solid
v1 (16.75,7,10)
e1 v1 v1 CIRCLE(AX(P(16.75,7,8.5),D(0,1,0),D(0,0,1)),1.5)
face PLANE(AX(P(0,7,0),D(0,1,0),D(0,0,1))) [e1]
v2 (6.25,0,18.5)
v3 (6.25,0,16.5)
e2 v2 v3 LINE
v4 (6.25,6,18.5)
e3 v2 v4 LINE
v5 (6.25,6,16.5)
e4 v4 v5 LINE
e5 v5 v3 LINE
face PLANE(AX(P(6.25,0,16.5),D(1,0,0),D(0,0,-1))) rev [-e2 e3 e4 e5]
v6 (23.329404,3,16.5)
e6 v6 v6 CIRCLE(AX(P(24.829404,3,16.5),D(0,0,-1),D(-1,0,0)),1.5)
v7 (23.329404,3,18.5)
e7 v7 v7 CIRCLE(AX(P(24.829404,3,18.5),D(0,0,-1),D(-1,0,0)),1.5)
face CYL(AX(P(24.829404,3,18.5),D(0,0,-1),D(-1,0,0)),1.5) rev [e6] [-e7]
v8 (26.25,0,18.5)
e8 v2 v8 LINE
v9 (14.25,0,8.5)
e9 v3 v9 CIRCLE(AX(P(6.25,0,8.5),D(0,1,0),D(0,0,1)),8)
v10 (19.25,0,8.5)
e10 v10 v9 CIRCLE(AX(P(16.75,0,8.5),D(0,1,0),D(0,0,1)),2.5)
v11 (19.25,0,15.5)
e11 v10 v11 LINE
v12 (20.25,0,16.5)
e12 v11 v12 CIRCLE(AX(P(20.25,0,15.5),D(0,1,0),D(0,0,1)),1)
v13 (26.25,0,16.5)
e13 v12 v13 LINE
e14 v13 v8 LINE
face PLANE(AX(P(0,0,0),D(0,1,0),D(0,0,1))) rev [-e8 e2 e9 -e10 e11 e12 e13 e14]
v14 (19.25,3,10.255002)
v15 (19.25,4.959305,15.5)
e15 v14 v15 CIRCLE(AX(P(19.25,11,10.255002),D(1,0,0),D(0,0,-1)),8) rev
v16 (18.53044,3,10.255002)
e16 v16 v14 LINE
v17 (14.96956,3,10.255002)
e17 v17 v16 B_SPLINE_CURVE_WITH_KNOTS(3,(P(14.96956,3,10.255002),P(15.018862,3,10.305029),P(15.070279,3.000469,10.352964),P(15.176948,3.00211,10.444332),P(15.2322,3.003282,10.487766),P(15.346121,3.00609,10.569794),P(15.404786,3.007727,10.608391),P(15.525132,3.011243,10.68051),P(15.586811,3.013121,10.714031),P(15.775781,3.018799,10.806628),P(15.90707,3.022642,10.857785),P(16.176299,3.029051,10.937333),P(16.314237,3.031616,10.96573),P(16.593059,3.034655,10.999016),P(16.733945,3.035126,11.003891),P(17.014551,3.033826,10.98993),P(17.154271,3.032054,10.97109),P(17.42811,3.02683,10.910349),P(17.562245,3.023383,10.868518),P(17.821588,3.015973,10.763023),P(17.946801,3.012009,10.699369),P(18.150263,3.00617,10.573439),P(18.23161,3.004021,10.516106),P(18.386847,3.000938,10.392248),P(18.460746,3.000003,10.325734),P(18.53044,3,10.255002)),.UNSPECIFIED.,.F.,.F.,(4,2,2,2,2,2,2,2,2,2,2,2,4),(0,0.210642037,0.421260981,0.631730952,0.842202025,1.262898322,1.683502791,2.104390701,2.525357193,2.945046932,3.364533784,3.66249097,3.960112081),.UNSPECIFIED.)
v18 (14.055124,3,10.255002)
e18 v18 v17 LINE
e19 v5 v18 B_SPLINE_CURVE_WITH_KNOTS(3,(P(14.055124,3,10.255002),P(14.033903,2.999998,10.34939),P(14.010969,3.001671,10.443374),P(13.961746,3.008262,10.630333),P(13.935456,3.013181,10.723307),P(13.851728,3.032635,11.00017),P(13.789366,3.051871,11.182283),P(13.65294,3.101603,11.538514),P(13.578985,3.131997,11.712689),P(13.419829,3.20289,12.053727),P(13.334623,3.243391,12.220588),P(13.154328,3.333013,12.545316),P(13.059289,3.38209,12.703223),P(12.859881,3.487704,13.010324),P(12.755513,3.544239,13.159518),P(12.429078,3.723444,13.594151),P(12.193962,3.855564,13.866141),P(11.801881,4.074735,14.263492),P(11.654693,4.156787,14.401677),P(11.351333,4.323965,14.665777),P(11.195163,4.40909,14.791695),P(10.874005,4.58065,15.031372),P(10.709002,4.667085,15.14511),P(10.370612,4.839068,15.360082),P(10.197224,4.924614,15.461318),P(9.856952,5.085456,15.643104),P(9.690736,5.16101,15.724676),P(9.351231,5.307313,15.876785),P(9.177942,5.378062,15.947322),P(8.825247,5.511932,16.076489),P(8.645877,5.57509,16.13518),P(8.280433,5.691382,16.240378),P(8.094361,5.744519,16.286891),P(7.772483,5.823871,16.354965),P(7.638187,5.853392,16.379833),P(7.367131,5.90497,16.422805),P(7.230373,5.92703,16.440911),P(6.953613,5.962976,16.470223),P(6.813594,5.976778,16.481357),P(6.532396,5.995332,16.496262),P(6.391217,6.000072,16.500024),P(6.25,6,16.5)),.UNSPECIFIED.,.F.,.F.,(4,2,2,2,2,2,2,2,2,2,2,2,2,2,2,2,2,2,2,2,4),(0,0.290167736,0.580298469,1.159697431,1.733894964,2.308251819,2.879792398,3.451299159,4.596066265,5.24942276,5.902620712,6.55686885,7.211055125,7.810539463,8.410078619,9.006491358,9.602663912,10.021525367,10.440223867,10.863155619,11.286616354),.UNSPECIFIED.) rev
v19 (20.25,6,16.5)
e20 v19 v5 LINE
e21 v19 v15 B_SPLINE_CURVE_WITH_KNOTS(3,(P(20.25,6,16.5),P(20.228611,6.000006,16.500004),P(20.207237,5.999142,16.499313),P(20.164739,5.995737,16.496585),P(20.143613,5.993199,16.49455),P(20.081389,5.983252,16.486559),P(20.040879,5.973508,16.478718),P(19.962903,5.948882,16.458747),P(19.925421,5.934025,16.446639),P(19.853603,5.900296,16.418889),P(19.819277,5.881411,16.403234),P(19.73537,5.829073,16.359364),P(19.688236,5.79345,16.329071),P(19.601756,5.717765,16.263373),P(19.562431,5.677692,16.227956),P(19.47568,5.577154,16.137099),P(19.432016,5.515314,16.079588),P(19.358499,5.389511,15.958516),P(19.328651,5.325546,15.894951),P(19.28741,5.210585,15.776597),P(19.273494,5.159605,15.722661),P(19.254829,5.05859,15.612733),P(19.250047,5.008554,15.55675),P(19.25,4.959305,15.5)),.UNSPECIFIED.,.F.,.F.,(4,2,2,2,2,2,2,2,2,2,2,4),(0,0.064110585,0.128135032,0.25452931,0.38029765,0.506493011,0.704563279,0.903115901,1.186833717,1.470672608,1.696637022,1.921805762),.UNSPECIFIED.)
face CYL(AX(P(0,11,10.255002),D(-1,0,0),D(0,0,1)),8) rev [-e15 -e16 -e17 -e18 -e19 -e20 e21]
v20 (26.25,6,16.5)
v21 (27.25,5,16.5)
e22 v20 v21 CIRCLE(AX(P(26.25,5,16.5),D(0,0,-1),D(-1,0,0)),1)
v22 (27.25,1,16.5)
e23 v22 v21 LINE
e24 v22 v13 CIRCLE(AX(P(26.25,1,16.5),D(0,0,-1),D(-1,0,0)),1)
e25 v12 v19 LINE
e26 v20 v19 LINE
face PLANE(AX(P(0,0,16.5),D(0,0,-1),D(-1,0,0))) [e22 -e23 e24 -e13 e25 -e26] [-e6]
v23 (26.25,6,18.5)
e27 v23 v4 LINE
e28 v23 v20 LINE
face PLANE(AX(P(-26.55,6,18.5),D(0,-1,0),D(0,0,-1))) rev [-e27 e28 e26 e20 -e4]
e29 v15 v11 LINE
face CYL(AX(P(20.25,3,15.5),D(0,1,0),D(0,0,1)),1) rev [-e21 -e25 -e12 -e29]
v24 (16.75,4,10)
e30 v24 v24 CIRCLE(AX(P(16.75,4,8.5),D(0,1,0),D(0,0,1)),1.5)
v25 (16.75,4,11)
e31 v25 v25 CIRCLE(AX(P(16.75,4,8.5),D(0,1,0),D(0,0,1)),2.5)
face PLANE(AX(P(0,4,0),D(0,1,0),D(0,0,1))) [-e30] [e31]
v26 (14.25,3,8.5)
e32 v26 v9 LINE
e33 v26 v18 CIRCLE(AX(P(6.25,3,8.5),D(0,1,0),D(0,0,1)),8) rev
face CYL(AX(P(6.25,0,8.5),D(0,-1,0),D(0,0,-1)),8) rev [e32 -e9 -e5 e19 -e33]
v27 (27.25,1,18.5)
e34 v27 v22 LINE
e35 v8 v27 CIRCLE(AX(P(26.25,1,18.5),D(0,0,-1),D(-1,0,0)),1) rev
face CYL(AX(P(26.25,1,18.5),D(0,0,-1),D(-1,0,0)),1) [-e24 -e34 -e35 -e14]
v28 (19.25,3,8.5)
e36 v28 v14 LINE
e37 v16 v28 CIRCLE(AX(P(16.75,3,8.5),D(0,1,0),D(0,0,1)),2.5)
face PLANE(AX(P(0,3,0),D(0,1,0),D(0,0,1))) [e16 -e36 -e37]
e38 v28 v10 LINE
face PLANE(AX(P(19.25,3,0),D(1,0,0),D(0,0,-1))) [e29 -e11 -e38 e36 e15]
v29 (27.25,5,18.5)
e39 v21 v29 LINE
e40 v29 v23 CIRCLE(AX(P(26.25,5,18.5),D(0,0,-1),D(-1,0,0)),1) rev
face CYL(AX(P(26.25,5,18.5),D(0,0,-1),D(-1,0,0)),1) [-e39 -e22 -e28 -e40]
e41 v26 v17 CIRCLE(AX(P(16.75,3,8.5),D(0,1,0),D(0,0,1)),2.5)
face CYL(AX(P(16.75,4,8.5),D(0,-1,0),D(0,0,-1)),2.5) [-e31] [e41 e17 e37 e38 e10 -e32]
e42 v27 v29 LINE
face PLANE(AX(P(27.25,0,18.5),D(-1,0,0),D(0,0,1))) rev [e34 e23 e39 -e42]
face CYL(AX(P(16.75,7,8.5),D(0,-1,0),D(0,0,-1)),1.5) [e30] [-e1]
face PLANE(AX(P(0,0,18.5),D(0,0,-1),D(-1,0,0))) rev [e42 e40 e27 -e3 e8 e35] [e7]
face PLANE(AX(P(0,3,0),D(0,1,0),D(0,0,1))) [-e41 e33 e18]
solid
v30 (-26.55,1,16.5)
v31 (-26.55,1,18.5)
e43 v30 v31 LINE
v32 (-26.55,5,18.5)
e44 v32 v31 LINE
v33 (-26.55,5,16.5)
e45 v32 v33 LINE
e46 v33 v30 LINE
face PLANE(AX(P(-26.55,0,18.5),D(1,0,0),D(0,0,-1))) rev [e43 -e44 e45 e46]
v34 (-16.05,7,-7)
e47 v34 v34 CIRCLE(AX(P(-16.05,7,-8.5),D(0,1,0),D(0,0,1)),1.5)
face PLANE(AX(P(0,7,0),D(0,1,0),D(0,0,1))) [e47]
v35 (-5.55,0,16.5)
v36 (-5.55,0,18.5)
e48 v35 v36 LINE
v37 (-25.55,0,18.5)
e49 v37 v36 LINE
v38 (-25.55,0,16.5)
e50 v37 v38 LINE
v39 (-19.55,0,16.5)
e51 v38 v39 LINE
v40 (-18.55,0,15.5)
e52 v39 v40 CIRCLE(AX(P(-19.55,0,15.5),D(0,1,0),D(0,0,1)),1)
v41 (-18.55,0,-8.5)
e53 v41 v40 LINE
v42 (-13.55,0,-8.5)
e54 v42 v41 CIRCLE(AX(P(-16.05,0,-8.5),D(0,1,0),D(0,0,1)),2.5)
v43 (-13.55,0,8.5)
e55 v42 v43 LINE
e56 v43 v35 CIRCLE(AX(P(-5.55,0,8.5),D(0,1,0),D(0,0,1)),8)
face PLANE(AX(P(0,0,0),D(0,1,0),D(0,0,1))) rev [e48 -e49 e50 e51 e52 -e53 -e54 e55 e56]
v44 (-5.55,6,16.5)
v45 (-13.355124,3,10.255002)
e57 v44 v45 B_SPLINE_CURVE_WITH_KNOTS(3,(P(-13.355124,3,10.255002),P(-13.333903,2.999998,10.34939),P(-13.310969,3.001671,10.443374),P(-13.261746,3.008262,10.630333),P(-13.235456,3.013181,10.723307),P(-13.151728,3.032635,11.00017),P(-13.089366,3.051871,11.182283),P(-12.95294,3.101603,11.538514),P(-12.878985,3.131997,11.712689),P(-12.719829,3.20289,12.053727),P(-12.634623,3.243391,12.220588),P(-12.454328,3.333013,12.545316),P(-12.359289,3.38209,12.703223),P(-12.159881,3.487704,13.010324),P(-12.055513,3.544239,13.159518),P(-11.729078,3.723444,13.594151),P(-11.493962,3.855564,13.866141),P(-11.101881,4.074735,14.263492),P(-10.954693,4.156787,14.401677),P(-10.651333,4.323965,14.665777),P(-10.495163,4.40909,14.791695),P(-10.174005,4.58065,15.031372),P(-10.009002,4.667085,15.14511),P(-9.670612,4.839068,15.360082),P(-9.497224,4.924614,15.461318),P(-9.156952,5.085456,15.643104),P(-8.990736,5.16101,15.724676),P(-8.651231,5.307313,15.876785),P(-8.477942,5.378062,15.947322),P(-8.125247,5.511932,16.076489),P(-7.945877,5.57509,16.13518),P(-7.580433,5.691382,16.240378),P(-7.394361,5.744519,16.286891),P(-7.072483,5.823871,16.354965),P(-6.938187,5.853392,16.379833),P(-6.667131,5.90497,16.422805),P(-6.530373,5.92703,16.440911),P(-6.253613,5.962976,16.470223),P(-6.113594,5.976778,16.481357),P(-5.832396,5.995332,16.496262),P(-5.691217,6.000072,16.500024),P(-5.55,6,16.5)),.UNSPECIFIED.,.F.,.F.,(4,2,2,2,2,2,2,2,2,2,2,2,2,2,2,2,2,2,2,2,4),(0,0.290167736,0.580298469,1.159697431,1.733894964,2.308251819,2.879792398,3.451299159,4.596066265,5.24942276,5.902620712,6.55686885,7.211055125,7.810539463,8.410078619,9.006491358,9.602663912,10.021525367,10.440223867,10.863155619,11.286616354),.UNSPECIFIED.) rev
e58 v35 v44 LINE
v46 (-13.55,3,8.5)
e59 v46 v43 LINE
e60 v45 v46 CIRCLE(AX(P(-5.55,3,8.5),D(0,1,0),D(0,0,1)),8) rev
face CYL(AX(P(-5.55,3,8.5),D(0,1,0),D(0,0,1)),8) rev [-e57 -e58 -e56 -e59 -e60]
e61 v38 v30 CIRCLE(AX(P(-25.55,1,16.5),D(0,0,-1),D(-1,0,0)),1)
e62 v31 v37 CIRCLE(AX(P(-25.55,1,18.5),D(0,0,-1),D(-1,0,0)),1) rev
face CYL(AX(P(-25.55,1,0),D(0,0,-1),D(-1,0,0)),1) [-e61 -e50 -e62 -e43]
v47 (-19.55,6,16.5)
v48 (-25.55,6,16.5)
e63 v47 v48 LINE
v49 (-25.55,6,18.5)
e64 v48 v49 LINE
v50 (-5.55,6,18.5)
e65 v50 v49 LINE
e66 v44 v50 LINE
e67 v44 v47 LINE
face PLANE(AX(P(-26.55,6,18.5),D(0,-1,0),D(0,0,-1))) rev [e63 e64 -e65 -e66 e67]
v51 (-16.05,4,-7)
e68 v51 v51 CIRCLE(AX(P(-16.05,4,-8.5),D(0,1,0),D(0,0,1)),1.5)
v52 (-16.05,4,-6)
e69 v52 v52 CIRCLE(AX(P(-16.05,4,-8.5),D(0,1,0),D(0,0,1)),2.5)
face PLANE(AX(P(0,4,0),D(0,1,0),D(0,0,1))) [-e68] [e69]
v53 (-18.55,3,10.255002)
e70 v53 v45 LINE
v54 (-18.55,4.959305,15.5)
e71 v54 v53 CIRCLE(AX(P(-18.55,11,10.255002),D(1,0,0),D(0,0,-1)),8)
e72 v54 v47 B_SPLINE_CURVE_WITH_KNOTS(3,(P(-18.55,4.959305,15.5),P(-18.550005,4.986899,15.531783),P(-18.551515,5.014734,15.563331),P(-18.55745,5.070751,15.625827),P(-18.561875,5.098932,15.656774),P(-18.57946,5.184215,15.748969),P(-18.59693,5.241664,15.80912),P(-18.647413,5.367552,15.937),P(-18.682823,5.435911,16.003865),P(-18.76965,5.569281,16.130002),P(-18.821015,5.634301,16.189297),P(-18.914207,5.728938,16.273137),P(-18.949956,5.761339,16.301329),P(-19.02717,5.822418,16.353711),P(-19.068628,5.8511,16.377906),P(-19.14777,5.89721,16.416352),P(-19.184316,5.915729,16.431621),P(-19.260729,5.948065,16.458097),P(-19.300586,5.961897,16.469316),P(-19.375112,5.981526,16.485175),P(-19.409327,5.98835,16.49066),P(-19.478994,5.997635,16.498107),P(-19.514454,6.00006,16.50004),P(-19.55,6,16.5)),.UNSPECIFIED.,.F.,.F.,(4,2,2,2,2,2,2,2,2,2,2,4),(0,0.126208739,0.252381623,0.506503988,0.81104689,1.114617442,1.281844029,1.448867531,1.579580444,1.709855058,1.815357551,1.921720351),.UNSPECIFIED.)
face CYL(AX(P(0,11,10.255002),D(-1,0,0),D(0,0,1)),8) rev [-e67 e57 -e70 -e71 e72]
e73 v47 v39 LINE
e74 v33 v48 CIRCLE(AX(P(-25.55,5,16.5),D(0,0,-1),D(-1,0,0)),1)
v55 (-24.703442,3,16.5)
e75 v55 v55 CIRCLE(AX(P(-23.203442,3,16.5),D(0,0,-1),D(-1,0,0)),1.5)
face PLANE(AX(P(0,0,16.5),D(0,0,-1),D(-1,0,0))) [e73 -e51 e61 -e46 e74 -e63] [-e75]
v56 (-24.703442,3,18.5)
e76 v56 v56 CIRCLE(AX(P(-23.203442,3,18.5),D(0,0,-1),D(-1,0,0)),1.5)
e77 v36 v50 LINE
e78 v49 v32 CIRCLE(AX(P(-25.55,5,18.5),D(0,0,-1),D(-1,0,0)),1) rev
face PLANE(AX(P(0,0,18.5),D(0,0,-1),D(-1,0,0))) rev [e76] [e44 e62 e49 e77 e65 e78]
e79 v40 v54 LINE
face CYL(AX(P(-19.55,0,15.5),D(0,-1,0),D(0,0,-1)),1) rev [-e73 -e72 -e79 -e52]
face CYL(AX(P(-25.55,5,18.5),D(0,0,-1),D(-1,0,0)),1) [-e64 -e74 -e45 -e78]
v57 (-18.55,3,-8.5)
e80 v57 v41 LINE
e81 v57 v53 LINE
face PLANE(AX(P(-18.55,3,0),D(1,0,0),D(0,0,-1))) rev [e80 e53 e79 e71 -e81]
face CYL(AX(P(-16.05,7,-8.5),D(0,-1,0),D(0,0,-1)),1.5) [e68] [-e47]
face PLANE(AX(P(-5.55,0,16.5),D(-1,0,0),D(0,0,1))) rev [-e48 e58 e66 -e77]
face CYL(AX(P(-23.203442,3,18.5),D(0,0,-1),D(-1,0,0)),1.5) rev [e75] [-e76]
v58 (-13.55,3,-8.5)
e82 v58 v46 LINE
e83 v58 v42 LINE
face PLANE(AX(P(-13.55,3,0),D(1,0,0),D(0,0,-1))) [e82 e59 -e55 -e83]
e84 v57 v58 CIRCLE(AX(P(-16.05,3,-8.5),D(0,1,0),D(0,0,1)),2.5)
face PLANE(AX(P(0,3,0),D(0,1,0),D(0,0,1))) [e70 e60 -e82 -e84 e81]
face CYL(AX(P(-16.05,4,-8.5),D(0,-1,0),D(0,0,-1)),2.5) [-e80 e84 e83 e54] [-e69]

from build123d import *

# Parameters (mm, degrees)
SKETCH1_W           = 5
SKETCH1_H           = 5
BOSS_EXTRUDE1_DEPTH = 3
BOSS_EXTRUDE2_DEPTH = 4
BOSS_EXTRUDE3_DEPTH = 7
SKETCH2_W           = 53.8
SKETCH2_H           = 6
BOSS_EXTRUDE4_DEPTH = 2
FILLET2_R           = 1
FILLET3_R           = 8
FILLET4_R           = 1
SKETCH4_W           = 11.8
SKETCH4_H           = 2
CUT_EXTRUDE2_DEPTH  = 34.478537919
SKETCH5_R           = 1.5
CUT_EXTRUDE3_DEPTH  = 2


with BuildPart() as part:
    # Sketch1 → Boss-Extrude1 (new body)
    with BuildSketch(Plane(origin=(0, 0, 0), x_dir=(1, 0, 0), z_dir=(0, 1, 0))):
        with BuildLine():
            Line((-18.55, 8.5), (-18.55, -11.5))
            Line((-18.55, -11.5), (-13.55, -11.5))
            Line((-13.55, -11.5), (-13.55, 8.5))
            ThreePointArc((-13.55, 8.5), (-16.05, 6), (-18.55, 8.5))
        make_face()
        with Locations((-16.05, -14)):
            Rectangle(SKETCH1_W, SKETCH1_H)
        with Locations((16.75, -14)):
            Rectangle(SKETCH1_W, SKETCH1_H)
        with BuildLine():
            Line((14.25, -11.5), (19.25, -11.5))
            Line((19.25, -11.5), (19.25, -8.5))
            ThreePointArc((19.25, -8.5), (16.75, -11), (14.25, -8.5))
            Line((14.25, -8.5), (14.25, -11.5))
        make_face()
    extrude(amount=BOSS_EXTRUDE1_DEPTH)

    # Sketch1<3> → Boss-Extrude2 (add)
    with BuildSketch(Plane(origin=(0, 0, 0), x_dir=(1, 0, 0), z_dir=(0, 1, 0))):
        with BuildLine():
            ThreePointArc((-13.55, 8.5), (-16.05, 11), (-18.55, 8.5))
            Line((-18.55, 8.5), (-17.55, 8.5))
            ThreePointArc((-17.55, 8.5), (-16.05, 10), (-14.55, 8.5))
            Line((-14.55, 8.5), (-13.55, 8.5))
        make_face()
        with BuildLine():
            Line((-17.55, 8.5), (-18.55, 8.5))
            ThreePointArc((-18.55, 8.5), (-16.05, 6), (-13.55, 8.5))
            Line((-13.55, 8.5), (-14.55, 8.5))
            ThreePointArc((-14.55, 8.5), (-16.05, 7), (-17.55, 8.5))
        make_face()
        with BuildLine():
            ThreePointArc((14.25, -8.5), (16.75, -11), (19.25, -8.5))
            Line((19.25, -8.5), (18.25, -8.5))
            ThreePointArc((18.25, -8.5), (16.75, -10), (15.25, -8.5))
            Line((15.25, -8.5), (14.25, -8.5))
        make_face()
        with BuildLine():
            Line((18.25, -8.5), (19.25, -8.5))
            ThreePointArc((19.25, -8.5), (16.75, -6), (14.25, -8.5))
            Line((14.25, -8.5), (15.25, -8.5))
            ThreePointArc((15.25, -8.5), (16.75, -7), (18.25, -8.5))
        make_face()
    extrude(amount=BOSS_EXTRUDE2_DEPTH)

    # Sketch1<4> → Boss-Extrude3 (add)
    with BuildSketch(Plane(origin=(0, 0, 0), x_dir=(1, 0, 0), z_dir=(0, 1, 0))):
        with BuildLine():
            ThreePointArc((-14.55, 8.5), (-16.05, 10), (-17.55, 8.5))
            Line((-17.55, 8.5), (-14.55, 8.5))
        make_face()
        with BuildLine():
            Line((-14.55, 8.5), (-17.55, 8.5))
            ThreePointArc((-17.55, 8.5), (-16.05, 7), (-14.55, 8.5))
        make_face()
        with BuildLine():
            ThreePointArc((15.25, -8.5), (16.75, -10), (18.25, -8.5))
            Line((18.25, -8.5), (15.25, -8.5))
        make_face()
        with BuildLine():
            Line((15.25, -8.5), (18.25, -8.5))
            ThreePointArc((18.25, -8.5), (16.75, -7), (15.25, -8.5))
        make_face()
    extrude(amount=BOSS_EXTRUDE3_DEPTH)

    # Sketch2 → Boss-Extrude4 (add)
    with BuildSketch(Plane.XY.offset(16.5)):
        with Locations((0.35, 3)):
            Rectangle(SKETCH2_W, SKETCH2_H)
    extrude(amount=BOSS_EXTRUDE4_DEPTH)

    # Fillet2
    fillet2_edges = [part.edges().sort_by_distance(p)[0] for p in [
        (-26.55, 6, 17.5),
        (-26.55, 0, 17.5),
        (27.25, 0, 17.5),
        (27.25, 6, 17.5),
    ]]
    fillet(fillet2_edges, radius=FILLET2_R)

    # Fillet3
    # the kernel refuses this fillet: 8 mm, written as the material it adds along each edge
    with BuildSketch(Plane(origin=(14.25, 0, 16.5), x_dir=(-1, 0, 0), z_dir=(0, 1, 0))) as fillet3_piece_1:
        with BuildLine():
            CenterArc((FILLET3_R, -FILLET3_R), FILLET3_R, 90, 90)
            Line((0, -FILLET3_R), (-FILLET3_R * 0.02, -FILLET3_R))
            Line((-FILLET3_R * 0.02, -FILLET3_R), (-FILLET3_R * 0.02, FILLET3_R * 0.02))
            Line((-FILLET3_R * 0.02, FILLET3_R * 0.02), (FILLET3_R, FILLET3_R * 0.02))
            Line((FILLET3_R, FILLET3_R * 0.02), (FILLET3_R, 0))
        make_face()
    extrude(amount=3)
    with BuildSketch(Plane(origin=(14.25, 3, 16.5), x_dir=(0, 1, 0), z_dir=(1, 0, 0)), Plane(origin=(-18.55, 3, 16.5), x_dir=(0, 1, 0), z_dir=(1, 0, 0))) as fillet3_piece_2:
        with BuildLine():
            CenterArc((8, -6.244997998), FILLET3_R, 128.682187453, 51.317812547)
            Line((0, -6.244997998), (-0.16, -6.244997998))
            Line((-0.16, -6.244997998), (-0.16, 0))
            Line((-0.16, 0), (0, 0.16))
            ThreePointArc((0, 0.16), (1.5, 0.16), (2.9, 0.12489996))
            Line((2.9, 0.12489996), (3, 0))
        make_face()
    extrude(amount=5)
    with BuildSketch(Plane(origin=(-13.55, 0, 16.5), x_dir=(1, 0, 0), z_dir=(0, 1, 0))) as fillet3_piece_3:
        with BuildLine():
            CenterArc((FILLET3_R, FILLET3_R), FILLET3_R, 180, 90)
            Line((0, FILLET3_R), (-FILLET3_R * 0.02, FILLET3_R))
            Line((-FILLET3_R * 0.02, FILLET3_R), (-FILLET3_R * 0.02, -FILLET3_R * 0.02))
            Line((-FILLET3_R * 0.02, -FILLET3_R * 0.02), (FILLET3_R, -FILLET3_R * 0.02))
            Line((FILLET3_R, -FILLET3_R * 0.02), (FILLET3_R, 0))
        make_face()
    extrude(amount=3)
    with BuildSketch(Plane(origin=(14.25, 0, 16.5), x_dir=(-1, 0, 0), z_dir=(0, 1, 0))) as fillet3_piece_4a_section:
        with BuildLine():
            CenterArc((FILLET3_R, -FILLET3_R), FILLET3_R, 90, 90)
            Line((0, -FILLET3_R), (-FILLET3_R * 0.02, -FILLET3_R))
            Line((-FILLET3_R * 0.02, -FILLET3_R), (-FILLET3_R * 0.02, FILLET3_R * 0.02))
            Line((-FILLET3_R * 0.02, FILLET3_R * 0.02), (FILLET3_R, FILLET3_R * 0.02))
            Line((FILLET3_R, FILLET3_R * 0.02), (FILLET3_R, 0))
        make_face()
    fillet3_piece_4a = extrude(amount=23, mode=Mode.PRIVATE)
    fillet3_piece_4a = split(fillet3_piece_4a, bisect_by=Plane(origin=(12.438839086, 6, 14.688839086), z_dir=(0, -1, 0)), keep=Keep.TOP, mode=Mode.PRIVATE)
    fillet3_piece_4a = split(fillet3_piece_4a, bisect_by=Plane(origin=(12.438839086, 3, 14.688839086), z_dir=(0, 1, 0)), keep=Keep.TOP, mode=Mode.PRIVATE)
    with BuildSketch(Plane(origin=(-1.362494996, 3, 16.5), x_dir=(0, 1, 0), z_dir=(1, 0, 0))) as fillet3_piece_4b_section:
        with BuildLine():
            CenterArc((8, -6.244997998), FILLET3_R, 128.682187453, 51.317812547)
            Line((0, -6.244997998), (-0.16, -6.244997998))
            Line((-0.16, -6.244997998), (-0.16, 0))
            Line((-0.16, 0), (0, 0.16))
            ThreePointArc((0, 0.16), (1.5, 0.16), (2.9, 0.12489996))
            Line((2.9, 0.12489996), (3, 0))
        make_face()
    fillet3_piece_4b = extrude(amount=20.612494996, mode=Mode.PRIVATE)
    fillet3_piece_4b = split(fillet3_piece_4b, bisect_by=Plane(origin=(14.25, 3.763389278, 14.878987527), z_dir=(-1, 0, 0)), keep=Keep.TOP, mode=Mode.PRIVATE)
    fillet3_piece_4 = fillet3_piece_4a & fillet3_piece_4b
    add(fillet3_piece_4)
    with BuildSketch(Plane(origin=(-18.55, 3, 16.5), x_dir=(0, 1, 0), z_dir=(1, 0, 0))) as fillet3_piece_5a_section:
        with BuildLine():
            CenterArc((8, -6.244997998), FILLET3_R, 128.682187453, 51.317812547)
            Line((0, -6.244997998), (-0.16, -6.244997998))
            Line((-0.16, -6.244997998), (-0.16, 0))
            Line((-0.16, 0), (0, 0.16))
            ThreePointArc((0, 0.16), (1.5, 0.16), (2.9, 0.12489996))
            Line((2.9, 0.12489996), (3, 0))
        make_face()
    fillet3_piece_5a = extrude(amount=20.612494996, mode=Mode.PRIVATE)
    fillet3_piece_5a = split(fillet3_piece_5a, bisect_by=Plane(origin=(-13.55, 3.763389278, 14.878987527), z_dir=(1, 0, 0)), keep=Keep.TOP, mode=Mode.PRIVATE)
    with BuildSketch(Plane(origin=(-13.55, 0, 16.5), x_dir=(1, 0, 0), z_dir=(0, 1, 0))) as fillet3_piece_5b_section:
        with BuildLine():
            CenterArc((FILLET3_R, FILLET3_R), FILLET3_R, 180, 90)
            Line((0, FILLET3_R), (-FILLET3_R * 0.02, FILLET3_R))
            Line((-FILLET3_R * 0.02, FILLET3_R), (-FILLET3_R * 0.02, -FILLET3_R * 0.02))
            Line((-FILLET3_R * 0.02, -FILLET3_R * 0.02), (FILLET3_R, -FILLET3_R * 0.02))
            Line((FILLET3_R, -FILLET3_R * 0.02), (FILLET3_R, 0))
        make_face()
    fillet3_piece_5b = extrude(amount=23, mode=Mode.PRIVATE)
    fillet3_piece_5b = split(fillet3_piece_5b, bisect_by=Plane(origin=(-11.738839086, 6, 14.688839086), z_dir=(0, -1, 0)), keep=Keep.TOP, mode=Mode.PRIVATE)
    fillet3_piece_5b = split(fillet3_piece_5b, bisect_by=Plane(origin=(-11.738839086, 3, 14.688839086), z_dir=(0, 1, 0)), keep=Keep.TOP, mode=Mode.PRIVATE)
    fillet3_piece_5 = fillet3_piece_5a & fillet3_piece_5b
    add(fillet3_piece_5)

    # Fillet4
    # the kernel refuses this fillet: 1 mm, written as the material it adds along each edge
    with BuildSketch(Plane(origin=(19.25, 6, 16.5), x_dir=(1, 0, 0), z_dir=(0, -1, 0))) as fillet4_piece_1_section:
        with BuildLine():
            CenterArc((FILLET4_R, -FILLET4_R), FILLET4_R, 90, 90)
            Line((0, -FILLET4_R), (0, 0))
            Line((0, 0), (FILLET4_R, 0))
        make_face()
    fillet4_piece_1 = extrude(amount=6, mode=Mode.PRIVATE)
    fillet4_piece_1 = fillet4_piece_1 - Plane(origin=(19.481697463, 11, 10.255002002), x_dir=(0, 1, 0), z_dir=(-1, 0, 0)) * Cylinder(8, 17, mode=Mode.PRIVATE)
    add(fillet4_piece_1)
    with BuildSketch(Plane(origin=(-18.55, 6, 16.5), x_dir=(-1, 0, 0), z_dir=(0, -1, 0))) as fillet4_piece_2_section:
        with BuildLine():
            CenterArc((FILLET4_R, FILLET4_R), FILLET4_R, 180, 90)
            Line((0, FILLET4_R), (0, 0))
            Line((0, 0), (FILLET4_R, 0))
        make_face()
    fillet4_piece_2 = extrude(amount=6, mode=Mode.PRIVATE)
    fillet4_piece_2 = fillet4_piece_2 - Plane(origin=(-18.781697463, 11, 10.255002002), x_dir=(0, 1, 0), z_dir=(-1, 0, 0)) * Cylinder(8, 17, mode=Mode.PRIVATE)
    add(fillet4_piece_2)

    # Sketch4 → Cut-Extrude2 (cut, through all)
    with BuildSketch(Plane(origin=(0, 6, 0), x_dir=(1, 0, 0), z_dir=(0, 1, 0))):
        with Locations((0.35, -17.5)):
            Rectangle(SKETCH4_W, SKETCH4_H)
    extrude(amount=-CUT_EXTRUDE2_DEPTH, mode=Mode.SUBTRACT)


with BuildPart() as cut_extrude2_piece_1:
    # of the separate pieces the step leaves, piece 1, a body of its own (cut_extrude2_pieces)
    add(part.part.solids().sort_by_distance((-18.55, 4.959305007, 15.5))[0])


with BuildPart() as cut_extrude2_piece_2:
    # of the separate pieces the step leaves, piece 2, a body of its own (cut_extrude2_pieces)
    add(part.part.solids().sort_by_distance((6.25, 0, 16.5))[0])


with BuildPart() as cut_extrude3_tool:
    # Sketch5 → Cut-Extrude3 (new body)
    with BuildSketch(Plane(origin=(0, 0, 16.5), x_dir=(-1, 0, 0), z_dir=(0, 0, -1))):
        with Locations((23.203442322, 3)):
            Circle(SKETCH5_R)
        with Locations((-24.829403808, 3)):
            Circle(SKETCH5_R)
    extrude(amount=-CUT_EXTRUDE3_DEPTH)


with BuildPart() as cut_extrude2_piece_1_1:
    add(cut_extrude2_piece_1.part)

    # Cut-Extrude3: cut by cut_extrude3_tool
    add(cut_extrude3_tool.part, mode=Mode.SUBTRACT)


with BuildPart() as cut_extrude2_piece_2_1:
    add(cut_extrude2_piece_2.part)

    # Cut-Extrude3: cut by cut_extrude3_tool
    add(cut_extrude3_tool.part, mode=Mode.SUBTRACT)


solid = Compound([cut_extrude2_piece_1_1.part, cut_extrude2_piece_2_1.part])
